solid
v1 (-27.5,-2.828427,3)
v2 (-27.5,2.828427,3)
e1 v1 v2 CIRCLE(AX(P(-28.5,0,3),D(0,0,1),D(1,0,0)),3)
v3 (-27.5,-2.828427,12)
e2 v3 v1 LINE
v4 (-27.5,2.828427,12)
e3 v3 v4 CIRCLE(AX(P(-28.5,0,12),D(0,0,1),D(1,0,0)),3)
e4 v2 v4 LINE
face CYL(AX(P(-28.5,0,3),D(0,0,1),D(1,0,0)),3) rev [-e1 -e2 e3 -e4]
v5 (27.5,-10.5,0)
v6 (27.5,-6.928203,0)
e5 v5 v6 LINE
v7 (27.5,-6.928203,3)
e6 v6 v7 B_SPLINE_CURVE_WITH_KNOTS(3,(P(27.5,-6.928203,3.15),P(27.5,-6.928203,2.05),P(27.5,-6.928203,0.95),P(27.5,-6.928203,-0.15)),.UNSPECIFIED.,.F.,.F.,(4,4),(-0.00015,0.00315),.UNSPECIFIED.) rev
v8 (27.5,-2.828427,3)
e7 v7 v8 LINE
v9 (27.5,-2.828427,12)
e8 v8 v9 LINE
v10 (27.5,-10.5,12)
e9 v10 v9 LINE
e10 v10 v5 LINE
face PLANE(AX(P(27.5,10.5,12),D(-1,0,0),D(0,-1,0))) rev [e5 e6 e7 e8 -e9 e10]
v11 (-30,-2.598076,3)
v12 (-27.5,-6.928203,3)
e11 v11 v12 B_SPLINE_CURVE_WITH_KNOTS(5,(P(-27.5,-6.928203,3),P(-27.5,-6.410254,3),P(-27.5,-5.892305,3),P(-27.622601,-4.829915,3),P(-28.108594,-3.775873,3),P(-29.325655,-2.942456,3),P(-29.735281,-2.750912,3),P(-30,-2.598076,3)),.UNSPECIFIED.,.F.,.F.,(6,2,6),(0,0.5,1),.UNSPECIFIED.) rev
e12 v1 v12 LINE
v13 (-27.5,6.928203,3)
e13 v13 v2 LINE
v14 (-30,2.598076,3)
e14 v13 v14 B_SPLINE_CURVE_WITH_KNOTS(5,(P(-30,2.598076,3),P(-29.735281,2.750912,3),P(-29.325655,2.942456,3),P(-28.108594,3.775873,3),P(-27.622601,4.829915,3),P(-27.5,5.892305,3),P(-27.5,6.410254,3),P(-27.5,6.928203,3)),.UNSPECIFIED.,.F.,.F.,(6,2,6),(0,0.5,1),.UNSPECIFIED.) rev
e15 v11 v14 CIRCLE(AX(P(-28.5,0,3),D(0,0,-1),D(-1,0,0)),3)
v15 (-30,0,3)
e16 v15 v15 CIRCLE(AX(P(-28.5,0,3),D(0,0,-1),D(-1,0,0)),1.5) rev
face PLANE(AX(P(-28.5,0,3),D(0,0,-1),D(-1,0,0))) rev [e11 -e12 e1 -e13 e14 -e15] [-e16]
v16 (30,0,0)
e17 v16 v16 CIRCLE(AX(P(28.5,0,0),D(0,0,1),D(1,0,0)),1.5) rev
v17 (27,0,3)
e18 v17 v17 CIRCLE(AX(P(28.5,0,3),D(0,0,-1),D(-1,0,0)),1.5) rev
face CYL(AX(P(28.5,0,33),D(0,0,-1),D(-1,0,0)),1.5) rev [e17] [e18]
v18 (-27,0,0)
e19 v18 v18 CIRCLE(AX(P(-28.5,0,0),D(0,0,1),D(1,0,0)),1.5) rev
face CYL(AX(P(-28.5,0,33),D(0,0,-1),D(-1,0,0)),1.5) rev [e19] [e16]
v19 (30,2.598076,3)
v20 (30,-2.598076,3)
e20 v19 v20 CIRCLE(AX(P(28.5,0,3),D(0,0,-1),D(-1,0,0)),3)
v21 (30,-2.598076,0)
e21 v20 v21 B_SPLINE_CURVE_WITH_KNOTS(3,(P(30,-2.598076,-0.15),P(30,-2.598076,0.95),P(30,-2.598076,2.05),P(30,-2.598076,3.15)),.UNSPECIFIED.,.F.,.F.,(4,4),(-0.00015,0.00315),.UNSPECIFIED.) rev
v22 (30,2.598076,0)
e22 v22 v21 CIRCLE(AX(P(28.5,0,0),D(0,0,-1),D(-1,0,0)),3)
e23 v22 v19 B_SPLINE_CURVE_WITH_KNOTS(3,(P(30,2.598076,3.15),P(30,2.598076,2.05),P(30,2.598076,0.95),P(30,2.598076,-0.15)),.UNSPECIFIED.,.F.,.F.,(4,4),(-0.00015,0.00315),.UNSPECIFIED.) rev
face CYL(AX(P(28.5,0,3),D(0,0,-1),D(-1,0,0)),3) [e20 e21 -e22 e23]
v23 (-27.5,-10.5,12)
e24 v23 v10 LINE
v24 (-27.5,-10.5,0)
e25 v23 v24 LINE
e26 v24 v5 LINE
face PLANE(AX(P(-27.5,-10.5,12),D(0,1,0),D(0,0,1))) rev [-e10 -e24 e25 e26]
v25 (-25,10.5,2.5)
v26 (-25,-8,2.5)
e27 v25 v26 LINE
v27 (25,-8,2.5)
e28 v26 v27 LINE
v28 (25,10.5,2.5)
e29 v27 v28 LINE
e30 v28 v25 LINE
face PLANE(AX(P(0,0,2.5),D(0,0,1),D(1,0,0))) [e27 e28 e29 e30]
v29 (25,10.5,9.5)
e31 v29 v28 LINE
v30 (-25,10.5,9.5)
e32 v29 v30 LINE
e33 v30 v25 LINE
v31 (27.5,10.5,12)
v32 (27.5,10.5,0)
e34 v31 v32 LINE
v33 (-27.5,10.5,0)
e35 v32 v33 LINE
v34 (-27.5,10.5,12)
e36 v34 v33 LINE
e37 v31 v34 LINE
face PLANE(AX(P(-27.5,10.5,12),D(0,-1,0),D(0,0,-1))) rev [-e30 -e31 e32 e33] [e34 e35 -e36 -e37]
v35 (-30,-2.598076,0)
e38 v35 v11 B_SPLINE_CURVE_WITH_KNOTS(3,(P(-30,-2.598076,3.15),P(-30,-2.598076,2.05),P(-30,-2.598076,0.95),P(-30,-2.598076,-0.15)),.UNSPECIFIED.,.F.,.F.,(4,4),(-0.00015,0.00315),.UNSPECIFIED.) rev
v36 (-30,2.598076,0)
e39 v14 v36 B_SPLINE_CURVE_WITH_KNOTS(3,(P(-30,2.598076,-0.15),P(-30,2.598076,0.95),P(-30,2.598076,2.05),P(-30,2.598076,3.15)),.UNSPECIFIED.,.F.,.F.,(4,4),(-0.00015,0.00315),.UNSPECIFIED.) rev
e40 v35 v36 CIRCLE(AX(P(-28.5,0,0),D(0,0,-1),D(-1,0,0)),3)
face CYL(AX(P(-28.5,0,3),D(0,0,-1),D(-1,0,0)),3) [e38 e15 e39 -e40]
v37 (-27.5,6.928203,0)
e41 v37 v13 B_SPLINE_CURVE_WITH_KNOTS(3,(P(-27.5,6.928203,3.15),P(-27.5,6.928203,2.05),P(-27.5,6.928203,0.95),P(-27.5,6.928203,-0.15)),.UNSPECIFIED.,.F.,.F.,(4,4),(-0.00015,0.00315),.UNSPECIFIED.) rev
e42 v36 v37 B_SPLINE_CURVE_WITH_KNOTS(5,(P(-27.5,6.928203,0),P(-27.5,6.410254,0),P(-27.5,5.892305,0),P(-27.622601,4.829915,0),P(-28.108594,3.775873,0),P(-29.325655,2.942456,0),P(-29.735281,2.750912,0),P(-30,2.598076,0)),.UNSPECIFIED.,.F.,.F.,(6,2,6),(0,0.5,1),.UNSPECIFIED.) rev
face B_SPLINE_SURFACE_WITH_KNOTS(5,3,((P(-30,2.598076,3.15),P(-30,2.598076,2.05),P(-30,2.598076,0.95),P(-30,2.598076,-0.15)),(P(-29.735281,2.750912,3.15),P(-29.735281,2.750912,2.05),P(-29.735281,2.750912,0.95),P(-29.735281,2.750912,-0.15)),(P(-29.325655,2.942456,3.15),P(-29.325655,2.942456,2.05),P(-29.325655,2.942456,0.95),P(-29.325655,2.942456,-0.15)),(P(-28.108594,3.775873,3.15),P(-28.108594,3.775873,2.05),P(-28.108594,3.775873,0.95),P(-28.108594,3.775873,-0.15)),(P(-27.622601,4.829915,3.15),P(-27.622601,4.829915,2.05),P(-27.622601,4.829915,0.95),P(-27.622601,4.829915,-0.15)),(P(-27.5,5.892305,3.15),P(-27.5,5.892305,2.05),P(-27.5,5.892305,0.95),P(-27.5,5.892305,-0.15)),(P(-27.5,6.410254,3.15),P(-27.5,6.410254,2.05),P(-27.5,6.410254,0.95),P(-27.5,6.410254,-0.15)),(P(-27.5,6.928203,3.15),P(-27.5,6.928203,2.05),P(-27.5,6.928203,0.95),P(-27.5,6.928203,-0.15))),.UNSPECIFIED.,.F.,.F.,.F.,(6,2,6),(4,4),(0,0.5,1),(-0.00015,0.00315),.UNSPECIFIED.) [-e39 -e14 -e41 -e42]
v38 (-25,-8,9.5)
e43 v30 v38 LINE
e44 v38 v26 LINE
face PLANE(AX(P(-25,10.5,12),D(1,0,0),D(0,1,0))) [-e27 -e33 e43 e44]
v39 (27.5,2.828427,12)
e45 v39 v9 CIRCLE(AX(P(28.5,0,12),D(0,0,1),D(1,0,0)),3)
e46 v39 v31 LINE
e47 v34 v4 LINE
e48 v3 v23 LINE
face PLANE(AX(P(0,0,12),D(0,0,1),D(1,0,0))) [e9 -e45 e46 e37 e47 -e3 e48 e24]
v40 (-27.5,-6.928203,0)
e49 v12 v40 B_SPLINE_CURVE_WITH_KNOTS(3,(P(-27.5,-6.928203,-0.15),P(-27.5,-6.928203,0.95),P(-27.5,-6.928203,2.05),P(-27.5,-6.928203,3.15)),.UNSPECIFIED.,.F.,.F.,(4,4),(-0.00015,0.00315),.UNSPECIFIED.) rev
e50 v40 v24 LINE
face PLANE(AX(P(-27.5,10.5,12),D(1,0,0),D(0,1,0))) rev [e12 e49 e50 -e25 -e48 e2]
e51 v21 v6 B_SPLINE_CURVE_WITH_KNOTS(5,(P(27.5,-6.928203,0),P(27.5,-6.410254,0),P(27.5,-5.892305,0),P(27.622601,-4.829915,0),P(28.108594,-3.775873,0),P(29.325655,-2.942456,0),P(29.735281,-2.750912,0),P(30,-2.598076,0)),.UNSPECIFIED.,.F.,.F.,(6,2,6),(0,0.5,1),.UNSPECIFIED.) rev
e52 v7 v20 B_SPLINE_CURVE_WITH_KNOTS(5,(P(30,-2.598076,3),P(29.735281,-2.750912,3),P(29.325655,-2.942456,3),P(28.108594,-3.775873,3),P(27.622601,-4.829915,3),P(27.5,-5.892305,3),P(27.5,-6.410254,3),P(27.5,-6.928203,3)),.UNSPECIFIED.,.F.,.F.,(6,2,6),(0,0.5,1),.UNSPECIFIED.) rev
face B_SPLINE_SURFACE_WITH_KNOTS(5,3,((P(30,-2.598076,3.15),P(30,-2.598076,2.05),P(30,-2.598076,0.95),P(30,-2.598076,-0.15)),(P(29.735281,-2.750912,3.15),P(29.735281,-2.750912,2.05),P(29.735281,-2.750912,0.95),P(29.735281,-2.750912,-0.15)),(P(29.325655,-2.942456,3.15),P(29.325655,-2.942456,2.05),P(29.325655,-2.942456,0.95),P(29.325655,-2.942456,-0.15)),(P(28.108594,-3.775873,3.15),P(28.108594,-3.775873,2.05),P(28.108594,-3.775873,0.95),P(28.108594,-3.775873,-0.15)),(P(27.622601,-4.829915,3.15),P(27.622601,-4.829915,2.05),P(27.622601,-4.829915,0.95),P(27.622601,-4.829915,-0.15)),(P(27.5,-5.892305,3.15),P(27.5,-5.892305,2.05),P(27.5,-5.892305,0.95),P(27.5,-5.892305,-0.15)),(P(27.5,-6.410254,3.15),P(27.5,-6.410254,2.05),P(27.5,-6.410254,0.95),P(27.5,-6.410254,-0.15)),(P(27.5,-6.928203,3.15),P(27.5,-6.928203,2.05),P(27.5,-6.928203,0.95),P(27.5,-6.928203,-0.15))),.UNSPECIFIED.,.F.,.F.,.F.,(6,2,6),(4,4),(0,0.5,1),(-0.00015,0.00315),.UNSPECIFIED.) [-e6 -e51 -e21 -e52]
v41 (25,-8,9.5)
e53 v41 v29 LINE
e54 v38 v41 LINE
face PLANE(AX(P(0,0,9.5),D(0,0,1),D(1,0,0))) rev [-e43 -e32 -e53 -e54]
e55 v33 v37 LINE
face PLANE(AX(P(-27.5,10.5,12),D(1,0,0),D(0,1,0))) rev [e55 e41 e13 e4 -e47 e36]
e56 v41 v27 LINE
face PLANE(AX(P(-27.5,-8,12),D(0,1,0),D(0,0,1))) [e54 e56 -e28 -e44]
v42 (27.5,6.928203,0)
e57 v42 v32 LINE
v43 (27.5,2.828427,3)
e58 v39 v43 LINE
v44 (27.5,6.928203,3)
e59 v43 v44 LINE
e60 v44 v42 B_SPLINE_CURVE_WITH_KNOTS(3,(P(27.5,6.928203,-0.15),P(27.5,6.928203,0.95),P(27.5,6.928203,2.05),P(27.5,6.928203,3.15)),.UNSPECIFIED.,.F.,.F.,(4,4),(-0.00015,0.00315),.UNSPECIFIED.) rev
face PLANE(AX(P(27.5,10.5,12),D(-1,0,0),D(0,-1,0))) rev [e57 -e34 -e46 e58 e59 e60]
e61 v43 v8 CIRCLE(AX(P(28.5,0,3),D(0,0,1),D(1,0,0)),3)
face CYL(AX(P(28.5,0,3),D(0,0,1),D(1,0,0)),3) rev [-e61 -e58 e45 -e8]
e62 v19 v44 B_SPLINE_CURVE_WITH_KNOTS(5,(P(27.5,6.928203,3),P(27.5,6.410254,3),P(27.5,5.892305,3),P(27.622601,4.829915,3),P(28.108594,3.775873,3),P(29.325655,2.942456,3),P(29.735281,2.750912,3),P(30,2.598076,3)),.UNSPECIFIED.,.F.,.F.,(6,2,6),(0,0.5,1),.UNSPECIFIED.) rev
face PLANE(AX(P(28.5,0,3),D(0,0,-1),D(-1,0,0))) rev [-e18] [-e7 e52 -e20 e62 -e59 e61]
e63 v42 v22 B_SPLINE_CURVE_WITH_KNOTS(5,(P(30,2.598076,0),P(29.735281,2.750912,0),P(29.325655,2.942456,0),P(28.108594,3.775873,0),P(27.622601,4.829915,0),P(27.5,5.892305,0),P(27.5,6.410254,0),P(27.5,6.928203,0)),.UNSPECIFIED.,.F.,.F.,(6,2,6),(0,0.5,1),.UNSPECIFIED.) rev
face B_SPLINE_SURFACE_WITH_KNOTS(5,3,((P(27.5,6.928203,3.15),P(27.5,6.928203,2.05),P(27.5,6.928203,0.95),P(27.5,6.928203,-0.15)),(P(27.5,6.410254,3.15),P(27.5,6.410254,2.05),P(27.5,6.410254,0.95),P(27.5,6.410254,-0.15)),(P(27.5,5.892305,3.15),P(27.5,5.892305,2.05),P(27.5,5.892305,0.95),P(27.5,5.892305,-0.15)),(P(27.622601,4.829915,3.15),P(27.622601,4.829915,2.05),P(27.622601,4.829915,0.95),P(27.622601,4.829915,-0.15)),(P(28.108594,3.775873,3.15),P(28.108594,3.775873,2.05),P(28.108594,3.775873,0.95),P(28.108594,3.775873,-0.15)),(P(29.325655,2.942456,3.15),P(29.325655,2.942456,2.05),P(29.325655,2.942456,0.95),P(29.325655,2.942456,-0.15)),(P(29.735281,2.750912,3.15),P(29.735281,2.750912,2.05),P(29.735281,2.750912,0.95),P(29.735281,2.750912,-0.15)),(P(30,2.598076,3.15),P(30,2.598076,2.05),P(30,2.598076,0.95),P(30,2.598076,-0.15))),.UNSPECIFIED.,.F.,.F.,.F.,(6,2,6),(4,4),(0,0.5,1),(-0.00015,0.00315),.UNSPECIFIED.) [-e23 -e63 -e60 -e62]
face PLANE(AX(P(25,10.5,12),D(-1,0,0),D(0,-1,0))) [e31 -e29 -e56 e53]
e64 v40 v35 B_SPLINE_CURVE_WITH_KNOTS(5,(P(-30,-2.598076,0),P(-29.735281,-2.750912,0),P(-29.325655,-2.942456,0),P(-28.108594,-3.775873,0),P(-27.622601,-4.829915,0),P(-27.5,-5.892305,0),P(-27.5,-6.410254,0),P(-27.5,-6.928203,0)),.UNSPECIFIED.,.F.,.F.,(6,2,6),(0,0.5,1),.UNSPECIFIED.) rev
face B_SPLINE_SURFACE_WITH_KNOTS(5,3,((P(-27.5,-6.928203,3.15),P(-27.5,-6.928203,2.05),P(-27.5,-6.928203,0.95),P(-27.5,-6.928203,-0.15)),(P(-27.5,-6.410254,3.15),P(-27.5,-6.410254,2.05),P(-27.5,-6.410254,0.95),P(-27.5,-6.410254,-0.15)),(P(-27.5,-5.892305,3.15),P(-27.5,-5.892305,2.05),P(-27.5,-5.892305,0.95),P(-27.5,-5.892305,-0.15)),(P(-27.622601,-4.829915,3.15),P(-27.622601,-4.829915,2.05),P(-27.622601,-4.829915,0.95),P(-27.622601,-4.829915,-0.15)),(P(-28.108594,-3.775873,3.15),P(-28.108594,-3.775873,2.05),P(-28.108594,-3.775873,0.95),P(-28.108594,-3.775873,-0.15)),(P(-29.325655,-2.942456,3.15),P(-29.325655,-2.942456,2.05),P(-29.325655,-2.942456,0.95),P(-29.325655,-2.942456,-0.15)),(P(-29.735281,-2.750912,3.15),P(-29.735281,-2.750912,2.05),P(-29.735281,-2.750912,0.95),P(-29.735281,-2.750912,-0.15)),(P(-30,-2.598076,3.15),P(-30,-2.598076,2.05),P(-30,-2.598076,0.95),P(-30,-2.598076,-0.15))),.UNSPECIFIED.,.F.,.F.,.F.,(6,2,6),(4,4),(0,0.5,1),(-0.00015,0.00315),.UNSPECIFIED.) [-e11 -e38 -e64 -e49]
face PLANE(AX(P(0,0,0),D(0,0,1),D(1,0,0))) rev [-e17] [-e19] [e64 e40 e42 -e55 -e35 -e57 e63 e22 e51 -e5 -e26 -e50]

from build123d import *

# Parameters (mm, degrees)
SKETCH1_W               = 55
SKETCH1_H               = 21
BOSS_EXTRUDE1_DEPTH     = 12
SHELL1_T                = -2.5
SKETCH2_R               = 3
BOSS_EXTRUDE2_DEPTH     = 3
CUT_EXTRUDE1_DEPTH      = 30
CUT_EXTRUDE1_DEPTH_BACK = 5
SKETCH3_R               = 1.5
CUT_EXTRUDE5_START      = -9
SKETCH4_R               = 3
CUT_EXTRUDE5_DEPTH      = 9
FILLET1_DEPTH           = 3


with BuildPart() as part:
    # Sketch1 → Boss-Extrude1 (new body)
    with BuildSketch(Plane.XY):
        Rectangle(SKETCH1_W, SKETCH1_H)
    extrude(amount=BOSS_EXTRUDE1_DEPTH)

    # Shell1
    shell1_openings = [part.faces().sort_by_distance(p)[0] for p in [
        (0, 10.5, 6),
    ]]
    offset(amount=SHELL1_T, openings=shell1_openings, kind=Kind.INTERSECTION)

    # Sketch2 → Boss-Extrude2 (add)
    with BuildSketch(Plane(origin=(0, 0, 0), x_dir=(-1, 0, 0), z_dir=(0, 0, -1))):
        with Locations((28.5, 0)):
            Circle(SKETCH2_R)
        with Locations((-28.5, 0)):
            Circle(SKETCH2_R)
    extrude(amount=-BOSS_EXTRUDE2_DEPTH)

    # Sketch3 → Cut-Extrude1 (cut, two sides: drawn at the far end of the back side and taken through both)
    with BuildSketch(Plane.XY.offset(3).offset(-CUT_EXTRUDE1_DEPTH_BACK)):
        with Locations(Location((-28.5, 0, 0), (0, 0, 48.189685104))):
            Circle(SKETCH3_R)
        with Locations(Location((28.5, 0, 0), (0, 0, 131.810314896))):
            Circle(SKETCH3_R)
    extrude(amount=CUT_EXTRUDE1_DEPTH + CUT_EXTRUDE1_DEPTH_BACK, mode=Mode.SUBTRACT)

    # Sketch4 → Cut-Extrude5 (cut)
    with BuildSketch(Plane.XY.offset(12).offset(CUT_EXTRUDE5_START)):
        with Locations((-28.5, 0)):
            Circle(SKETCH4_R)
        with Locations((28.5, 0)):
            Circle(SKETCH4_R)
    extrude(amount=CUT_EXTRUDE5_DEPTH, mode=Mode.SUBTRACT)

    # Fillet1: read off the stored shape, not the designer's step
    # Fillet1 outline → Fillet1 (add)
    with BuildSketch(Plane.XY):
        with BuildLine():
            add(Edge.make_bspline(
                [(30, -2.598076211), (29.735280722, -2.750911958), (29.325654839, -2.942455607), (28.108593688, -3.775872627), (27.622600662, -4.829914939), (27.5, -5.892304845), (27.5, -6.410254038), (27.5, -6.92820323)],
                knots=[0, 0, 0, 0, 0, 0, 0.5, 0.5, 1, 1, 1, 1, 1, 1], degree=5))
            ThreePointArc((30, -2.598076211), (28.775255129, -2.987345748), (27.5, -2.828427125))
            Line((27.5, -2.828427125), (27.5, -6.92820323))
        make_face()
        with BuildLine():
            add(Edge.make_bspline(
                [(27.5, 6.92820323), (27.5, 6.410254038), (27.5, 5.892304845), (27.622600662, 4.829914939), (28.108593688, 3.775872627), (29.325654839, 2.942455607), (29.735280722, 2.750911958), (30, 2.598076211)],
                knots=[0, 0, 0, 0, 0, 0, 0.5, 0.5, 1, 1, 1, 1, 1, 1], degree=5))
            Line((27.5, 6.92820323), (27.5, 2.828427125))
            ThreePointArc((27.5, 2.828427125), (28.775255129, 2.987345748), (30, 2.598076211))
        make_face()
        with BuildLine():
            add(Edge.make_bspline(
                [(-30, 2.598076211), (-29.735280722, 2.750911958), (-29.325654839, 2.942455607), (-28.108593688, 3.775872627), (-27.622600662, 4.829914939), (-27.5, 5.892304845), (-27.5, 6.410254038), (-27.5, 6.92820323)],
                knots=[0, 0, 0, 0, 0, 0, 0.5, 0.5, 1, 1, 1, 1, 1, 1], degree=5))
            ThreePointArc((-30, 2.598076211), (-28.775255129, 2.987345748), (-27.5, 2.828427125))
            Line((-27.5, 2.828427125), (-27.5, 6.92820323))
        make_face()
        with BuildLine():
            add(Edge.make_bspline(
                [(-27.5, -6.92820323), (-27.5, -6.410254038), (-27.5, -5.892304845), (-27.622600662, -4.829914939), (-28.108593688, -3.775872627), (-29.325654839, -2.942455607), (-29.735280722, -2.750911958), (-30, -2.598076211)],
                knots=[0, 0, 0, 0, 0, 0, 0.5, 0.5, 1, 1, 1, 1, 1, 1], degree=5))
            Line((-27.5, -6.92820323), (-27.5, -2.828427125))
            ThreePointArc((-27.5, -2.828427125), (-28.775255129, -2.987345748), (-30, -2.598076211))
        make_face()
    extrude(amount=FILLET1_DEPTH)


solid = part.part
